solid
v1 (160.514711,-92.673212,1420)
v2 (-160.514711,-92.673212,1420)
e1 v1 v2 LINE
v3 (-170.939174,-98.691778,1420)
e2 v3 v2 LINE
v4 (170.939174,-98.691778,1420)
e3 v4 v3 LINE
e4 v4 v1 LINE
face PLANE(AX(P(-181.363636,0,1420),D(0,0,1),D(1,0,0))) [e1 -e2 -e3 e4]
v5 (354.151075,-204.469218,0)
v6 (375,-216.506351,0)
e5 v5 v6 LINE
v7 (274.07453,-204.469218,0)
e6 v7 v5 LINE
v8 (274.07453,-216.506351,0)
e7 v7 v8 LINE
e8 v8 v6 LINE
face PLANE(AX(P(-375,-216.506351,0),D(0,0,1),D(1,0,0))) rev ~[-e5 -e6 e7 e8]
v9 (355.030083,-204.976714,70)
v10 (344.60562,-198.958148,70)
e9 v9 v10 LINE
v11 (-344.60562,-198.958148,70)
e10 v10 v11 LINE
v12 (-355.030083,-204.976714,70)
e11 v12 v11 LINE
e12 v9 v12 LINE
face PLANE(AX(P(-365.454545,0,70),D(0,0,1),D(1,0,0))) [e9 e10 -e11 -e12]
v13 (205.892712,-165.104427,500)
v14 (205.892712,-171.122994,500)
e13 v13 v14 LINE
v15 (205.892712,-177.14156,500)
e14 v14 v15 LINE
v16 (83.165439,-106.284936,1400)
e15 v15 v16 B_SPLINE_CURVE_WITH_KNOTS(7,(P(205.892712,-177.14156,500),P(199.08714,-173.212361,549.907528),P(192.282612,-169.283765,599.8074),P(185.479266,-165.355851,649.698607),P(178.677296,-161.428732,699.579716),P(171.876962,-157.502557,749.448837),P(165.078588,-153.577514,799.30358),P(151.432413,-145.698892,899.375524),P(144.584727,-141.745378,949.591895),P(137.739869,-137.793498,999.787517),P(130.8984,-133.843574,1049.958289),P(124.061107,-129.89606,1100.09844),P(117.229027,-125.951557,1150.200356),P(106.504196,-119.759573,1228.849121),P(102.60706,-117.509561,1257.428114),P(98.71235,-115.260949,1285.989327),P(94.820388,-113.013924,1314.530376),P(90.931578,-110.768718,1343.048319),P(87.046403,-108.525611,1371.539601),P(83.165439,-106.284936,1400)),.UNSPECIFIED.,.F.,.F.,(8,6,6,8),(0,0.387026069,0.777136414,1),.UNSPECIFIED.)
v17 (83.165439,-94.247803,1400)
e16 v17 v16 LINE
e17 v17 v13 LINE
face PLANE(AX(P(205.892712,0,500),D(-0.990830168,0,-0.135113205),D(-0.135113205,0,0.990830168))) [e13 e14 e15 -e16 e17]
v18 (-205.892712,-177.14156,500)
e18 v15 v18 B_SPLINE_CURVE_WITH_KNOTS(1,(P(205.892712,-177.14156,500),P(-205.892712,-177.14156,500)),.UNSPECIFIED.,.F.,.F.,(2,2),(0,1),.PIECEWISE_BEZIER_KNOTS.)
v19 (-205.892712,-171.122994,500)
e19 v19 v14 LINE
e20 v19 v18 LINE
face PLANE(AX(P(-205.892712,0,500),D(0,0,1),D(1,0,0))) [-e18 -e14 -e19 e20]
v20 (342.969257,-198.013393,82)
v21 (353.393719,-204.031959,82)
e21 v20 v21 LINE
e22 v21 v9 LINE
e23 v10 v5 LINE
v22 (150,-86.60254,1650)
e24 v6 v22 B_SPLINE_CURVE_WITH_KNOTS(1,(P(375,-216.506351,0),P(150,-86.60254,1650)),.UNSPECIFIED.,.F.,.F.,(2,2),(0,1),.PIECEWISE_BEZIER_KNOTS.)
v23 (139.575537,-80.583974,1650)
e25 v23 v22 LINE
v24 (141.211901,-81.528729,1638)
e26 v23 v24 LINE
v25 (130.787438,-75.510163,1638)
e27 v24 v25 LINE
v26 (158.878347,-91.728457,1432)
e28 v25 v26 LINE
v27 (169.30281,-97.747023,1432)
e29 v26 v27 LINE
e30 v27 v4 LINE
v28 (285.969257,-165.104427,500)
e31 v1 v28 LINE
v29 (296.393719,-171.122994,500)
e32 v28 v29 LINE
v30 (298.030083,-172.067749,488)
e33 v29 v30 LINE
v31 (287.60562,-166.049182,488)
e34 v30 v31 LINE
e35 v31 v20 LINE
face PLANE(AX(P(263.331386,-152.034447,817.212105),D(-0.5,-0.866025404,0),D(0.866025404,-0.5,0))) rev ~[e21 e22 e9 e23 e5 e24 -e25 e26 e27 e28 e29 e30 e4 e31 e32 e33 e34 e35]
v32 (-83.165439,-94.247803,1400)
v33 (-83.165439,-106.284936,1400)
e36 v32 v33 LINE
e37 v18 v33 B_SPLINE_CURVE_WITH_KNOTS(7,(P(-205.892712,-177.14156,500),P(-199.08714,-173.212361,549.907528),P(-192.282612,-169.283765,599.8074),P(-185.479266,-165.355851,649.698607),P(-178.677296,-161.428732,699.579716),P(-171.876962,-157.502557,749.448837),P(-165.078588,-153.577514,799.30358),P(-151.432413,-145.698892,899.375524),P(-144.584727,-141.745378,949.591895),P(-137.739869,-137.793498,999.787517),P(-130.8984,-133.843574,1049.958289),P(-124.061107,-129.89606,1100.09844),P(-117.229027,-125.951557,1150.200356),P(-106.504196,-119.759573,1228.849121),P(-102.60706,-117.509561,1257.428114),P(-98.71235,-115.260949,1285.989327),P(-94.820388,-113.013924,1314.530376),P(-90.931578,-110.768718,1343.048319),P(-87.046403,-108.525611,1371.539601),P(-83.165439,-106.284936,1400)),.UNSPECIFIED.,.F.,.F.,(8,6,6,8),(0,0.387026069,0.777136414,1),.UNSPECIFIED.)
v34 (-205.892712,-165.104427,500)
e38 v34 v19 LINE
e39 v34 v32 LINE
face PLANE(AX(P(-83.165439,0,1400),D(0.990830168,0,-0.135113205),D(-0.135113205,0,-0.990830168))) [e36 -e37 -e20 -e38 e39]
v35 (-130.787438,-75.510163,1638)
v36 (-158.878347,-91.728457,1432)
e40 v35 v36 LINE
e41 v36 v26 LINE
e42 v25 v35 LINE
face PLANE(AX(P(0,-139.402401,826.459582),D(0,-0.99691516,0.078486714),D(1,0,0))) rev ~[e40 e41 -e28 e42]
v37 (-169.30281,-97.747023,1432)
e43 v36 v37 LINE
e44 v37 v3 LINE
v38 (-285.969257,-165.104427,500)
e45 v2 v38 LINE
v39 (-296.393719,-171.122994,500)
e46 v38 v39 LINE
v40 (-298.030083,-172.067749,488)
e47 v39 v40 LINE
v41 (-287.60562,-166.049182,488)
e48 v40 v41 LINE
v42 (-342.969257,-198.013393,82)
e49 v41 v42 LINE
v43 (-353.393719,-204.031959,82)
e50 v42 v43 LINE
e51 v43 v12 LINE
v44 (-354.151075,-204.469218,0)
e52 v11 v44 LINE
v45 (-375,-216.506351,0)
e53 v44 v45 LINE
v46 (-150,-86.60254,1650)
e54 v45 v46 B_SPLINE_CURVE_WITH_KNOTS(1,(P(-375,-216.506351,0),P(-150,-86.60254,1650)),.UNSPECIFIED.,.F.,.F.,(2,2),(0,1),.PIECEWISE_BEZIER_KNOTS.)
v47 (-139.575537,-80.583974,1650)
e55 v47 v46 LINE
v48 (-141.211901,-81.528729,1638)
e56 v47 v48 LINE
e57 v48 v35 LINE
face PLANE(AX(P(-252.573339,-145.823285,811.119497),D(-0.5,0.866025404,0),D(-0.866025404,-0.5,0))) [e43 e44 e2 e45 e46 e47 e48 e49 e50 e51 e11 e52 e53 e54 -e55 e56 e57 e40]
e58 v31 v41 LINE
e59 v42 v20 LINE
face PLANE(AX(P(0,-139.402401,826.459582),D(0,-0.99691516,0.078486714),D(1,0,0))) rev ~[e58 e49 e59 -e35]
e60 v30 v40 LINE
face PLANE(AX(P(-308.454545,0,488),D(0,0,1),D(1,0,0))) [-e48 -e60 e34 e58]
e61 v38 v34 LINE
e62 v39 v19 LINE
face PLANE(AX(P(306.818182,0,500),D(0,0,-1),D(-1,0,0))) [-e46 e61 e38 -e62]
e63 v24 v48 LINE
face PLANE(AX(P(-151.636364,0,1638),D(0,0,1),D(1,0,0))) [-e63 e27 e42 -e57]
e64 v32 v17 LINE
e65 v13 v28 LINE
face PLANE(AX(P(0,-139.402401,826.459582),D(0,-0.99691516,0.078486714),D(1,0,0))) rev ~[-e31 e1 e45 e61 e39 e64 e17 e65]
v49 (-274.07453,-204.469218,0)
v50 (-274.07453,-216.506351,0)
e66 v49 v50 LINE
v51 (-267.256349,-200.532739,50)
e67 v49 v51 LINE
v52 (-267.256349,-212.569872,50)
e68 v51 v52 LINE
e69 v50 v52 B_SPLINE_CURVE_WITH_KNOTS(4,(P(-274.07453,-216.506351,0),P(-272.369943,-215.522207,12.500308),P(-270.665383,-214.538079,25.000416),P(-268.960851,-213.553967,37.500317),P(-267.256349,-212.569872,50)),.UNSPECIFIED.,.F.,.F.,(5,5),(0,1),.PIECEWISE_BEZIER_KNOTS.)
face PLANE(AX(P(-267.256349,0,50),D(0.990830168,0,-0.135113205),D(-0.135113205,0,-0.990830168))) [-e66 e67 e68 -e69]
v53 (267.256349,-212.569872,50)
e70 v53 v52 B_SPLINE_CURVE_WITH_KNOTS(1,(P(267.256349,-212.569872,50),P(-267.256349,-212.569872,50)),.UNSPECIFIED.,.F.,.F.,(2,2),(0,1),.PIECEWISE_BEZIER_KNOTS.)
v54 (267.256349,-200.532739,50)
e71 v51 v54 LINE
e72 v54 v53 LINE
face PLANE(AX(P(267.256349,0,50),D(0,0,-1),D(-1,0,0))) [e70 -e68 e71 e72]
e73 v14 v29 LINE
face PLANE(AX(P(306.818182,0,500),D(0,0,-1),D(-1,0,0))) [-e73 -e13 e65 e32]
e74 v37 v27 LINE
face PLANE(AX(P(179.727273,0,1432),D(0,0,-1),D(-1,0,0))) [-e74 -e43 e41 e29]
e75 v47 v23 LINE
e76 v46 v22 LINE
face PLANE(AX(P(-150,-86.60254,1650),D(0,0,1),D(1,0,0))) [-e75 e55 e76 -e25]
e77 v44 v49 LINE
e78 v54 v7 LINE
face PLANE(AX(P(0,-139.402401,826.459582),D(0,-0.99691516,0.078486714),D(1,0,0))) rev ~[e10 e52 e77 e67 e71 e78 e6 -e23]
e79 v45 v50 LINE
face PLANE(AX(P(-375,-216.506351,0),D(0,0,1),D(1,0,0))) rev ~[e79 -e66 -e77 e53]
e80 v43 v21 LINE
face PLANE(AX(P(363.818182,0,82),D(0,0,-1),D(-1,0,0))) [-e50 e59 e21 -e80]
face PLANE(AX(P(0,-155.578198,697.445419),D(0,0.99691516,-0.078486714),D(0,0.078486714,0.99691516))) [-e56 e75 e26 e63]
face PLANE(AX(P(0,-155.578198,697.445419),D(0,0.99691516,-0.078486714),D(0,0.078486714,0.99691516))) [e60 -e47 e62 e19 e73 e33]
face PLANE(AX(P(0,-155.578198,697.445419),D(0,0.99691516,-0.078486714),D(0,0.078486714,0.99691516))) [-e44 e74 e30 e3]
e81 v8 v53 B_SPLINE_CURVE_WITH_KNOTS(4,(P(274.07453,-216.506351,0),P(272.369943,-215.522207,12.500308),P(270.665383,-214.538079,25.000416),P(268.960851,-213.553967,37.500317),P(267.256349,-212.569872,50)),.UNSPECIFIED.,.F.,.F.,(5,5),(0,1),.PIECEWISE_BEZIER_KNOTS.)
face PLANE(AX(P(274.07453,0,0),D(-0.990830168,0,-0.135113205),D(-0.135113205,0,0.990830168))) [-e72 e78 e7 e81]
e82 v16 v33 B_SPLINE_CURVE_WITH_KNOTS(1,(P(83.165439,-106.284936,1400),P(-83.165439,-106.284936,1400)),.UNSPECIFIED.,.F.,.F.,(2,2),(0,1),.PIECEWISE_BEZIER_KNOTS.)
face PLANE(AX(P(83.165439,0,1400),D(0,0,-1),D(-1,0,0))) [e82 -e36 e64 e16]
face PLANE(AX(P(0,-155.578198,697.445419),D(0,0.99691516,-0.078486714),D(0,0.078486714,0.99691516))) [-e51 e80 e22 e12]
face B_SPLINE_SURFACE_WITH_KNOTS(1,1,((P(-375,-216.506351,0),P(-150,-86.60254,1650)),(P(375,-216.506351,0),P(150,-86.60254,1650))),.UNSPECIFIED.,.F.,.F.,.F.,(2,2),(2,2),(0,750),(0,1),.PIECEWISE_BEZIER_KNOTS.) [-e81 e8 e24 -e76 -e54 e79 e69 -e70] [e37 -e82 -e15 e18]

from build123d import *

# Parameters (mm, degrees)
F7_R      = 960.2431856589
F8_DEPTH  = 635.5163904251
F12_R     = 870.2287794889
F13_DEPTH = 25
F14_R     = 892.9375722879
F15_DEPTH = 25
F19_REACH = 935.9843056137
F20_DEPTH = 216.5073510461


with BuildPart() as f5:
    # F3 (on Top) → F5 section 0
    with BuildSketch(Plane.XY):
        Polygon((-375, -216.5063509461), (375, -216.5063509461), (0, 433.0127018922), align=None)
    # F4 (on line) → F5 section 1
    with BuildSketch(Plane.XY.offset(1650)):
        Polygon((-150, -86.6025403784), (150, -86.6025403784), (0, 173.2050807569), align=None)
    loft()

    # F7 (on face) → F8 (cut, through all)
    with BuildSketch(Plane(origin=(0, -203.2096543416, 15.9986111776), x_dir=(1, 0, 0), z_dir=(0, -0.9969151597, 0.078486714))):
        with Locations((0, 812.9688501358)):
            Circle(F7_R)
    extrude(amount=-F8_DEPTH, mode=Mode.SUBTRACT)

    # F12 (on face) → F13 (cut)
    with BuildSketch(Plane(origin=(0, 0, 0), x_dir=(0.8660254038, -0.5, 0), z_dir=(-0.5, -0.8660254038, 0))):
        with Locations((304.0688931942, 817.2121047974)):
            Circle(F12_R)
    extrude(amount=-F13_DEPTH, mode=Mode.SUBTRACT)

    # F14 (on face) → F15 (cut)
    with BuildSketch(Plane(origin=(0, 0, 0), x_dir=(-0.8660254038, -0.5, 0), z_dir=(-0.5, 0.8660254038, 0))):
        with Locations((291.6465699673, 811.1194968224)):
            Circle(F14_R)
    extrude(amount=F15_DEPTH, mode=Mode.SUBTRACT)

    f19_end = Plane(origin=(0, -155.5781982198, 697.4454188962), x_dir=(0, 0.078486714, 0.9969151597), z_dir=(0, 0.9969151597, -0.078486714))
    # F17 (on Front) → F19 (cut, up to a plane its end follows)
    with BuildSketch(Plane.XZ):
        Polygon((-181.3636363636, 1420), (181.3636363636, 1420), (179.7272727273, 1432), (-179.7272727273, 1432), align=None)
        Polygon((151.6363636364, 1638), (150, 1650), (-150, 1650), (-151.6363636364, 1638), align=None)
        Polygon((308.4545454545, 488), (306.8181818182, 500), (-306.8181818182, 500), (-308.4545454545, 488), align=None)
        Polygon((-365.4545454545, 70), (365.4545454545, 70), (363.8181818182, 82), (-363.8181818182, 82), align=None)
    f19_long = extrude(amount=F19_REACH, mode=Mode.PRIVATE)
    add(split(f19_long, bisect_by=f19_end, keep=Keep.TOP, mode=Mode.PRIVATE), mode=Mode.SUBTRACT)

    # F16 (on Front) → F20 (cut, through all)
    with BuildSketch(Plane.XZ):
        Polygon((-267.2563485856, 50), (-274.0745304038, 0), (274.0745304038, 0), (267.2563485856, 50), align=None)
        Polygon((-205.8927122219, 500), (205.8927122219, 500), (83.1654394947, 1400), (-83.1654394947, 1400), align=None)
    extrude(amount=F20_DEPTH, mode=Mode.SUBTRACT)


solid = f5.part
